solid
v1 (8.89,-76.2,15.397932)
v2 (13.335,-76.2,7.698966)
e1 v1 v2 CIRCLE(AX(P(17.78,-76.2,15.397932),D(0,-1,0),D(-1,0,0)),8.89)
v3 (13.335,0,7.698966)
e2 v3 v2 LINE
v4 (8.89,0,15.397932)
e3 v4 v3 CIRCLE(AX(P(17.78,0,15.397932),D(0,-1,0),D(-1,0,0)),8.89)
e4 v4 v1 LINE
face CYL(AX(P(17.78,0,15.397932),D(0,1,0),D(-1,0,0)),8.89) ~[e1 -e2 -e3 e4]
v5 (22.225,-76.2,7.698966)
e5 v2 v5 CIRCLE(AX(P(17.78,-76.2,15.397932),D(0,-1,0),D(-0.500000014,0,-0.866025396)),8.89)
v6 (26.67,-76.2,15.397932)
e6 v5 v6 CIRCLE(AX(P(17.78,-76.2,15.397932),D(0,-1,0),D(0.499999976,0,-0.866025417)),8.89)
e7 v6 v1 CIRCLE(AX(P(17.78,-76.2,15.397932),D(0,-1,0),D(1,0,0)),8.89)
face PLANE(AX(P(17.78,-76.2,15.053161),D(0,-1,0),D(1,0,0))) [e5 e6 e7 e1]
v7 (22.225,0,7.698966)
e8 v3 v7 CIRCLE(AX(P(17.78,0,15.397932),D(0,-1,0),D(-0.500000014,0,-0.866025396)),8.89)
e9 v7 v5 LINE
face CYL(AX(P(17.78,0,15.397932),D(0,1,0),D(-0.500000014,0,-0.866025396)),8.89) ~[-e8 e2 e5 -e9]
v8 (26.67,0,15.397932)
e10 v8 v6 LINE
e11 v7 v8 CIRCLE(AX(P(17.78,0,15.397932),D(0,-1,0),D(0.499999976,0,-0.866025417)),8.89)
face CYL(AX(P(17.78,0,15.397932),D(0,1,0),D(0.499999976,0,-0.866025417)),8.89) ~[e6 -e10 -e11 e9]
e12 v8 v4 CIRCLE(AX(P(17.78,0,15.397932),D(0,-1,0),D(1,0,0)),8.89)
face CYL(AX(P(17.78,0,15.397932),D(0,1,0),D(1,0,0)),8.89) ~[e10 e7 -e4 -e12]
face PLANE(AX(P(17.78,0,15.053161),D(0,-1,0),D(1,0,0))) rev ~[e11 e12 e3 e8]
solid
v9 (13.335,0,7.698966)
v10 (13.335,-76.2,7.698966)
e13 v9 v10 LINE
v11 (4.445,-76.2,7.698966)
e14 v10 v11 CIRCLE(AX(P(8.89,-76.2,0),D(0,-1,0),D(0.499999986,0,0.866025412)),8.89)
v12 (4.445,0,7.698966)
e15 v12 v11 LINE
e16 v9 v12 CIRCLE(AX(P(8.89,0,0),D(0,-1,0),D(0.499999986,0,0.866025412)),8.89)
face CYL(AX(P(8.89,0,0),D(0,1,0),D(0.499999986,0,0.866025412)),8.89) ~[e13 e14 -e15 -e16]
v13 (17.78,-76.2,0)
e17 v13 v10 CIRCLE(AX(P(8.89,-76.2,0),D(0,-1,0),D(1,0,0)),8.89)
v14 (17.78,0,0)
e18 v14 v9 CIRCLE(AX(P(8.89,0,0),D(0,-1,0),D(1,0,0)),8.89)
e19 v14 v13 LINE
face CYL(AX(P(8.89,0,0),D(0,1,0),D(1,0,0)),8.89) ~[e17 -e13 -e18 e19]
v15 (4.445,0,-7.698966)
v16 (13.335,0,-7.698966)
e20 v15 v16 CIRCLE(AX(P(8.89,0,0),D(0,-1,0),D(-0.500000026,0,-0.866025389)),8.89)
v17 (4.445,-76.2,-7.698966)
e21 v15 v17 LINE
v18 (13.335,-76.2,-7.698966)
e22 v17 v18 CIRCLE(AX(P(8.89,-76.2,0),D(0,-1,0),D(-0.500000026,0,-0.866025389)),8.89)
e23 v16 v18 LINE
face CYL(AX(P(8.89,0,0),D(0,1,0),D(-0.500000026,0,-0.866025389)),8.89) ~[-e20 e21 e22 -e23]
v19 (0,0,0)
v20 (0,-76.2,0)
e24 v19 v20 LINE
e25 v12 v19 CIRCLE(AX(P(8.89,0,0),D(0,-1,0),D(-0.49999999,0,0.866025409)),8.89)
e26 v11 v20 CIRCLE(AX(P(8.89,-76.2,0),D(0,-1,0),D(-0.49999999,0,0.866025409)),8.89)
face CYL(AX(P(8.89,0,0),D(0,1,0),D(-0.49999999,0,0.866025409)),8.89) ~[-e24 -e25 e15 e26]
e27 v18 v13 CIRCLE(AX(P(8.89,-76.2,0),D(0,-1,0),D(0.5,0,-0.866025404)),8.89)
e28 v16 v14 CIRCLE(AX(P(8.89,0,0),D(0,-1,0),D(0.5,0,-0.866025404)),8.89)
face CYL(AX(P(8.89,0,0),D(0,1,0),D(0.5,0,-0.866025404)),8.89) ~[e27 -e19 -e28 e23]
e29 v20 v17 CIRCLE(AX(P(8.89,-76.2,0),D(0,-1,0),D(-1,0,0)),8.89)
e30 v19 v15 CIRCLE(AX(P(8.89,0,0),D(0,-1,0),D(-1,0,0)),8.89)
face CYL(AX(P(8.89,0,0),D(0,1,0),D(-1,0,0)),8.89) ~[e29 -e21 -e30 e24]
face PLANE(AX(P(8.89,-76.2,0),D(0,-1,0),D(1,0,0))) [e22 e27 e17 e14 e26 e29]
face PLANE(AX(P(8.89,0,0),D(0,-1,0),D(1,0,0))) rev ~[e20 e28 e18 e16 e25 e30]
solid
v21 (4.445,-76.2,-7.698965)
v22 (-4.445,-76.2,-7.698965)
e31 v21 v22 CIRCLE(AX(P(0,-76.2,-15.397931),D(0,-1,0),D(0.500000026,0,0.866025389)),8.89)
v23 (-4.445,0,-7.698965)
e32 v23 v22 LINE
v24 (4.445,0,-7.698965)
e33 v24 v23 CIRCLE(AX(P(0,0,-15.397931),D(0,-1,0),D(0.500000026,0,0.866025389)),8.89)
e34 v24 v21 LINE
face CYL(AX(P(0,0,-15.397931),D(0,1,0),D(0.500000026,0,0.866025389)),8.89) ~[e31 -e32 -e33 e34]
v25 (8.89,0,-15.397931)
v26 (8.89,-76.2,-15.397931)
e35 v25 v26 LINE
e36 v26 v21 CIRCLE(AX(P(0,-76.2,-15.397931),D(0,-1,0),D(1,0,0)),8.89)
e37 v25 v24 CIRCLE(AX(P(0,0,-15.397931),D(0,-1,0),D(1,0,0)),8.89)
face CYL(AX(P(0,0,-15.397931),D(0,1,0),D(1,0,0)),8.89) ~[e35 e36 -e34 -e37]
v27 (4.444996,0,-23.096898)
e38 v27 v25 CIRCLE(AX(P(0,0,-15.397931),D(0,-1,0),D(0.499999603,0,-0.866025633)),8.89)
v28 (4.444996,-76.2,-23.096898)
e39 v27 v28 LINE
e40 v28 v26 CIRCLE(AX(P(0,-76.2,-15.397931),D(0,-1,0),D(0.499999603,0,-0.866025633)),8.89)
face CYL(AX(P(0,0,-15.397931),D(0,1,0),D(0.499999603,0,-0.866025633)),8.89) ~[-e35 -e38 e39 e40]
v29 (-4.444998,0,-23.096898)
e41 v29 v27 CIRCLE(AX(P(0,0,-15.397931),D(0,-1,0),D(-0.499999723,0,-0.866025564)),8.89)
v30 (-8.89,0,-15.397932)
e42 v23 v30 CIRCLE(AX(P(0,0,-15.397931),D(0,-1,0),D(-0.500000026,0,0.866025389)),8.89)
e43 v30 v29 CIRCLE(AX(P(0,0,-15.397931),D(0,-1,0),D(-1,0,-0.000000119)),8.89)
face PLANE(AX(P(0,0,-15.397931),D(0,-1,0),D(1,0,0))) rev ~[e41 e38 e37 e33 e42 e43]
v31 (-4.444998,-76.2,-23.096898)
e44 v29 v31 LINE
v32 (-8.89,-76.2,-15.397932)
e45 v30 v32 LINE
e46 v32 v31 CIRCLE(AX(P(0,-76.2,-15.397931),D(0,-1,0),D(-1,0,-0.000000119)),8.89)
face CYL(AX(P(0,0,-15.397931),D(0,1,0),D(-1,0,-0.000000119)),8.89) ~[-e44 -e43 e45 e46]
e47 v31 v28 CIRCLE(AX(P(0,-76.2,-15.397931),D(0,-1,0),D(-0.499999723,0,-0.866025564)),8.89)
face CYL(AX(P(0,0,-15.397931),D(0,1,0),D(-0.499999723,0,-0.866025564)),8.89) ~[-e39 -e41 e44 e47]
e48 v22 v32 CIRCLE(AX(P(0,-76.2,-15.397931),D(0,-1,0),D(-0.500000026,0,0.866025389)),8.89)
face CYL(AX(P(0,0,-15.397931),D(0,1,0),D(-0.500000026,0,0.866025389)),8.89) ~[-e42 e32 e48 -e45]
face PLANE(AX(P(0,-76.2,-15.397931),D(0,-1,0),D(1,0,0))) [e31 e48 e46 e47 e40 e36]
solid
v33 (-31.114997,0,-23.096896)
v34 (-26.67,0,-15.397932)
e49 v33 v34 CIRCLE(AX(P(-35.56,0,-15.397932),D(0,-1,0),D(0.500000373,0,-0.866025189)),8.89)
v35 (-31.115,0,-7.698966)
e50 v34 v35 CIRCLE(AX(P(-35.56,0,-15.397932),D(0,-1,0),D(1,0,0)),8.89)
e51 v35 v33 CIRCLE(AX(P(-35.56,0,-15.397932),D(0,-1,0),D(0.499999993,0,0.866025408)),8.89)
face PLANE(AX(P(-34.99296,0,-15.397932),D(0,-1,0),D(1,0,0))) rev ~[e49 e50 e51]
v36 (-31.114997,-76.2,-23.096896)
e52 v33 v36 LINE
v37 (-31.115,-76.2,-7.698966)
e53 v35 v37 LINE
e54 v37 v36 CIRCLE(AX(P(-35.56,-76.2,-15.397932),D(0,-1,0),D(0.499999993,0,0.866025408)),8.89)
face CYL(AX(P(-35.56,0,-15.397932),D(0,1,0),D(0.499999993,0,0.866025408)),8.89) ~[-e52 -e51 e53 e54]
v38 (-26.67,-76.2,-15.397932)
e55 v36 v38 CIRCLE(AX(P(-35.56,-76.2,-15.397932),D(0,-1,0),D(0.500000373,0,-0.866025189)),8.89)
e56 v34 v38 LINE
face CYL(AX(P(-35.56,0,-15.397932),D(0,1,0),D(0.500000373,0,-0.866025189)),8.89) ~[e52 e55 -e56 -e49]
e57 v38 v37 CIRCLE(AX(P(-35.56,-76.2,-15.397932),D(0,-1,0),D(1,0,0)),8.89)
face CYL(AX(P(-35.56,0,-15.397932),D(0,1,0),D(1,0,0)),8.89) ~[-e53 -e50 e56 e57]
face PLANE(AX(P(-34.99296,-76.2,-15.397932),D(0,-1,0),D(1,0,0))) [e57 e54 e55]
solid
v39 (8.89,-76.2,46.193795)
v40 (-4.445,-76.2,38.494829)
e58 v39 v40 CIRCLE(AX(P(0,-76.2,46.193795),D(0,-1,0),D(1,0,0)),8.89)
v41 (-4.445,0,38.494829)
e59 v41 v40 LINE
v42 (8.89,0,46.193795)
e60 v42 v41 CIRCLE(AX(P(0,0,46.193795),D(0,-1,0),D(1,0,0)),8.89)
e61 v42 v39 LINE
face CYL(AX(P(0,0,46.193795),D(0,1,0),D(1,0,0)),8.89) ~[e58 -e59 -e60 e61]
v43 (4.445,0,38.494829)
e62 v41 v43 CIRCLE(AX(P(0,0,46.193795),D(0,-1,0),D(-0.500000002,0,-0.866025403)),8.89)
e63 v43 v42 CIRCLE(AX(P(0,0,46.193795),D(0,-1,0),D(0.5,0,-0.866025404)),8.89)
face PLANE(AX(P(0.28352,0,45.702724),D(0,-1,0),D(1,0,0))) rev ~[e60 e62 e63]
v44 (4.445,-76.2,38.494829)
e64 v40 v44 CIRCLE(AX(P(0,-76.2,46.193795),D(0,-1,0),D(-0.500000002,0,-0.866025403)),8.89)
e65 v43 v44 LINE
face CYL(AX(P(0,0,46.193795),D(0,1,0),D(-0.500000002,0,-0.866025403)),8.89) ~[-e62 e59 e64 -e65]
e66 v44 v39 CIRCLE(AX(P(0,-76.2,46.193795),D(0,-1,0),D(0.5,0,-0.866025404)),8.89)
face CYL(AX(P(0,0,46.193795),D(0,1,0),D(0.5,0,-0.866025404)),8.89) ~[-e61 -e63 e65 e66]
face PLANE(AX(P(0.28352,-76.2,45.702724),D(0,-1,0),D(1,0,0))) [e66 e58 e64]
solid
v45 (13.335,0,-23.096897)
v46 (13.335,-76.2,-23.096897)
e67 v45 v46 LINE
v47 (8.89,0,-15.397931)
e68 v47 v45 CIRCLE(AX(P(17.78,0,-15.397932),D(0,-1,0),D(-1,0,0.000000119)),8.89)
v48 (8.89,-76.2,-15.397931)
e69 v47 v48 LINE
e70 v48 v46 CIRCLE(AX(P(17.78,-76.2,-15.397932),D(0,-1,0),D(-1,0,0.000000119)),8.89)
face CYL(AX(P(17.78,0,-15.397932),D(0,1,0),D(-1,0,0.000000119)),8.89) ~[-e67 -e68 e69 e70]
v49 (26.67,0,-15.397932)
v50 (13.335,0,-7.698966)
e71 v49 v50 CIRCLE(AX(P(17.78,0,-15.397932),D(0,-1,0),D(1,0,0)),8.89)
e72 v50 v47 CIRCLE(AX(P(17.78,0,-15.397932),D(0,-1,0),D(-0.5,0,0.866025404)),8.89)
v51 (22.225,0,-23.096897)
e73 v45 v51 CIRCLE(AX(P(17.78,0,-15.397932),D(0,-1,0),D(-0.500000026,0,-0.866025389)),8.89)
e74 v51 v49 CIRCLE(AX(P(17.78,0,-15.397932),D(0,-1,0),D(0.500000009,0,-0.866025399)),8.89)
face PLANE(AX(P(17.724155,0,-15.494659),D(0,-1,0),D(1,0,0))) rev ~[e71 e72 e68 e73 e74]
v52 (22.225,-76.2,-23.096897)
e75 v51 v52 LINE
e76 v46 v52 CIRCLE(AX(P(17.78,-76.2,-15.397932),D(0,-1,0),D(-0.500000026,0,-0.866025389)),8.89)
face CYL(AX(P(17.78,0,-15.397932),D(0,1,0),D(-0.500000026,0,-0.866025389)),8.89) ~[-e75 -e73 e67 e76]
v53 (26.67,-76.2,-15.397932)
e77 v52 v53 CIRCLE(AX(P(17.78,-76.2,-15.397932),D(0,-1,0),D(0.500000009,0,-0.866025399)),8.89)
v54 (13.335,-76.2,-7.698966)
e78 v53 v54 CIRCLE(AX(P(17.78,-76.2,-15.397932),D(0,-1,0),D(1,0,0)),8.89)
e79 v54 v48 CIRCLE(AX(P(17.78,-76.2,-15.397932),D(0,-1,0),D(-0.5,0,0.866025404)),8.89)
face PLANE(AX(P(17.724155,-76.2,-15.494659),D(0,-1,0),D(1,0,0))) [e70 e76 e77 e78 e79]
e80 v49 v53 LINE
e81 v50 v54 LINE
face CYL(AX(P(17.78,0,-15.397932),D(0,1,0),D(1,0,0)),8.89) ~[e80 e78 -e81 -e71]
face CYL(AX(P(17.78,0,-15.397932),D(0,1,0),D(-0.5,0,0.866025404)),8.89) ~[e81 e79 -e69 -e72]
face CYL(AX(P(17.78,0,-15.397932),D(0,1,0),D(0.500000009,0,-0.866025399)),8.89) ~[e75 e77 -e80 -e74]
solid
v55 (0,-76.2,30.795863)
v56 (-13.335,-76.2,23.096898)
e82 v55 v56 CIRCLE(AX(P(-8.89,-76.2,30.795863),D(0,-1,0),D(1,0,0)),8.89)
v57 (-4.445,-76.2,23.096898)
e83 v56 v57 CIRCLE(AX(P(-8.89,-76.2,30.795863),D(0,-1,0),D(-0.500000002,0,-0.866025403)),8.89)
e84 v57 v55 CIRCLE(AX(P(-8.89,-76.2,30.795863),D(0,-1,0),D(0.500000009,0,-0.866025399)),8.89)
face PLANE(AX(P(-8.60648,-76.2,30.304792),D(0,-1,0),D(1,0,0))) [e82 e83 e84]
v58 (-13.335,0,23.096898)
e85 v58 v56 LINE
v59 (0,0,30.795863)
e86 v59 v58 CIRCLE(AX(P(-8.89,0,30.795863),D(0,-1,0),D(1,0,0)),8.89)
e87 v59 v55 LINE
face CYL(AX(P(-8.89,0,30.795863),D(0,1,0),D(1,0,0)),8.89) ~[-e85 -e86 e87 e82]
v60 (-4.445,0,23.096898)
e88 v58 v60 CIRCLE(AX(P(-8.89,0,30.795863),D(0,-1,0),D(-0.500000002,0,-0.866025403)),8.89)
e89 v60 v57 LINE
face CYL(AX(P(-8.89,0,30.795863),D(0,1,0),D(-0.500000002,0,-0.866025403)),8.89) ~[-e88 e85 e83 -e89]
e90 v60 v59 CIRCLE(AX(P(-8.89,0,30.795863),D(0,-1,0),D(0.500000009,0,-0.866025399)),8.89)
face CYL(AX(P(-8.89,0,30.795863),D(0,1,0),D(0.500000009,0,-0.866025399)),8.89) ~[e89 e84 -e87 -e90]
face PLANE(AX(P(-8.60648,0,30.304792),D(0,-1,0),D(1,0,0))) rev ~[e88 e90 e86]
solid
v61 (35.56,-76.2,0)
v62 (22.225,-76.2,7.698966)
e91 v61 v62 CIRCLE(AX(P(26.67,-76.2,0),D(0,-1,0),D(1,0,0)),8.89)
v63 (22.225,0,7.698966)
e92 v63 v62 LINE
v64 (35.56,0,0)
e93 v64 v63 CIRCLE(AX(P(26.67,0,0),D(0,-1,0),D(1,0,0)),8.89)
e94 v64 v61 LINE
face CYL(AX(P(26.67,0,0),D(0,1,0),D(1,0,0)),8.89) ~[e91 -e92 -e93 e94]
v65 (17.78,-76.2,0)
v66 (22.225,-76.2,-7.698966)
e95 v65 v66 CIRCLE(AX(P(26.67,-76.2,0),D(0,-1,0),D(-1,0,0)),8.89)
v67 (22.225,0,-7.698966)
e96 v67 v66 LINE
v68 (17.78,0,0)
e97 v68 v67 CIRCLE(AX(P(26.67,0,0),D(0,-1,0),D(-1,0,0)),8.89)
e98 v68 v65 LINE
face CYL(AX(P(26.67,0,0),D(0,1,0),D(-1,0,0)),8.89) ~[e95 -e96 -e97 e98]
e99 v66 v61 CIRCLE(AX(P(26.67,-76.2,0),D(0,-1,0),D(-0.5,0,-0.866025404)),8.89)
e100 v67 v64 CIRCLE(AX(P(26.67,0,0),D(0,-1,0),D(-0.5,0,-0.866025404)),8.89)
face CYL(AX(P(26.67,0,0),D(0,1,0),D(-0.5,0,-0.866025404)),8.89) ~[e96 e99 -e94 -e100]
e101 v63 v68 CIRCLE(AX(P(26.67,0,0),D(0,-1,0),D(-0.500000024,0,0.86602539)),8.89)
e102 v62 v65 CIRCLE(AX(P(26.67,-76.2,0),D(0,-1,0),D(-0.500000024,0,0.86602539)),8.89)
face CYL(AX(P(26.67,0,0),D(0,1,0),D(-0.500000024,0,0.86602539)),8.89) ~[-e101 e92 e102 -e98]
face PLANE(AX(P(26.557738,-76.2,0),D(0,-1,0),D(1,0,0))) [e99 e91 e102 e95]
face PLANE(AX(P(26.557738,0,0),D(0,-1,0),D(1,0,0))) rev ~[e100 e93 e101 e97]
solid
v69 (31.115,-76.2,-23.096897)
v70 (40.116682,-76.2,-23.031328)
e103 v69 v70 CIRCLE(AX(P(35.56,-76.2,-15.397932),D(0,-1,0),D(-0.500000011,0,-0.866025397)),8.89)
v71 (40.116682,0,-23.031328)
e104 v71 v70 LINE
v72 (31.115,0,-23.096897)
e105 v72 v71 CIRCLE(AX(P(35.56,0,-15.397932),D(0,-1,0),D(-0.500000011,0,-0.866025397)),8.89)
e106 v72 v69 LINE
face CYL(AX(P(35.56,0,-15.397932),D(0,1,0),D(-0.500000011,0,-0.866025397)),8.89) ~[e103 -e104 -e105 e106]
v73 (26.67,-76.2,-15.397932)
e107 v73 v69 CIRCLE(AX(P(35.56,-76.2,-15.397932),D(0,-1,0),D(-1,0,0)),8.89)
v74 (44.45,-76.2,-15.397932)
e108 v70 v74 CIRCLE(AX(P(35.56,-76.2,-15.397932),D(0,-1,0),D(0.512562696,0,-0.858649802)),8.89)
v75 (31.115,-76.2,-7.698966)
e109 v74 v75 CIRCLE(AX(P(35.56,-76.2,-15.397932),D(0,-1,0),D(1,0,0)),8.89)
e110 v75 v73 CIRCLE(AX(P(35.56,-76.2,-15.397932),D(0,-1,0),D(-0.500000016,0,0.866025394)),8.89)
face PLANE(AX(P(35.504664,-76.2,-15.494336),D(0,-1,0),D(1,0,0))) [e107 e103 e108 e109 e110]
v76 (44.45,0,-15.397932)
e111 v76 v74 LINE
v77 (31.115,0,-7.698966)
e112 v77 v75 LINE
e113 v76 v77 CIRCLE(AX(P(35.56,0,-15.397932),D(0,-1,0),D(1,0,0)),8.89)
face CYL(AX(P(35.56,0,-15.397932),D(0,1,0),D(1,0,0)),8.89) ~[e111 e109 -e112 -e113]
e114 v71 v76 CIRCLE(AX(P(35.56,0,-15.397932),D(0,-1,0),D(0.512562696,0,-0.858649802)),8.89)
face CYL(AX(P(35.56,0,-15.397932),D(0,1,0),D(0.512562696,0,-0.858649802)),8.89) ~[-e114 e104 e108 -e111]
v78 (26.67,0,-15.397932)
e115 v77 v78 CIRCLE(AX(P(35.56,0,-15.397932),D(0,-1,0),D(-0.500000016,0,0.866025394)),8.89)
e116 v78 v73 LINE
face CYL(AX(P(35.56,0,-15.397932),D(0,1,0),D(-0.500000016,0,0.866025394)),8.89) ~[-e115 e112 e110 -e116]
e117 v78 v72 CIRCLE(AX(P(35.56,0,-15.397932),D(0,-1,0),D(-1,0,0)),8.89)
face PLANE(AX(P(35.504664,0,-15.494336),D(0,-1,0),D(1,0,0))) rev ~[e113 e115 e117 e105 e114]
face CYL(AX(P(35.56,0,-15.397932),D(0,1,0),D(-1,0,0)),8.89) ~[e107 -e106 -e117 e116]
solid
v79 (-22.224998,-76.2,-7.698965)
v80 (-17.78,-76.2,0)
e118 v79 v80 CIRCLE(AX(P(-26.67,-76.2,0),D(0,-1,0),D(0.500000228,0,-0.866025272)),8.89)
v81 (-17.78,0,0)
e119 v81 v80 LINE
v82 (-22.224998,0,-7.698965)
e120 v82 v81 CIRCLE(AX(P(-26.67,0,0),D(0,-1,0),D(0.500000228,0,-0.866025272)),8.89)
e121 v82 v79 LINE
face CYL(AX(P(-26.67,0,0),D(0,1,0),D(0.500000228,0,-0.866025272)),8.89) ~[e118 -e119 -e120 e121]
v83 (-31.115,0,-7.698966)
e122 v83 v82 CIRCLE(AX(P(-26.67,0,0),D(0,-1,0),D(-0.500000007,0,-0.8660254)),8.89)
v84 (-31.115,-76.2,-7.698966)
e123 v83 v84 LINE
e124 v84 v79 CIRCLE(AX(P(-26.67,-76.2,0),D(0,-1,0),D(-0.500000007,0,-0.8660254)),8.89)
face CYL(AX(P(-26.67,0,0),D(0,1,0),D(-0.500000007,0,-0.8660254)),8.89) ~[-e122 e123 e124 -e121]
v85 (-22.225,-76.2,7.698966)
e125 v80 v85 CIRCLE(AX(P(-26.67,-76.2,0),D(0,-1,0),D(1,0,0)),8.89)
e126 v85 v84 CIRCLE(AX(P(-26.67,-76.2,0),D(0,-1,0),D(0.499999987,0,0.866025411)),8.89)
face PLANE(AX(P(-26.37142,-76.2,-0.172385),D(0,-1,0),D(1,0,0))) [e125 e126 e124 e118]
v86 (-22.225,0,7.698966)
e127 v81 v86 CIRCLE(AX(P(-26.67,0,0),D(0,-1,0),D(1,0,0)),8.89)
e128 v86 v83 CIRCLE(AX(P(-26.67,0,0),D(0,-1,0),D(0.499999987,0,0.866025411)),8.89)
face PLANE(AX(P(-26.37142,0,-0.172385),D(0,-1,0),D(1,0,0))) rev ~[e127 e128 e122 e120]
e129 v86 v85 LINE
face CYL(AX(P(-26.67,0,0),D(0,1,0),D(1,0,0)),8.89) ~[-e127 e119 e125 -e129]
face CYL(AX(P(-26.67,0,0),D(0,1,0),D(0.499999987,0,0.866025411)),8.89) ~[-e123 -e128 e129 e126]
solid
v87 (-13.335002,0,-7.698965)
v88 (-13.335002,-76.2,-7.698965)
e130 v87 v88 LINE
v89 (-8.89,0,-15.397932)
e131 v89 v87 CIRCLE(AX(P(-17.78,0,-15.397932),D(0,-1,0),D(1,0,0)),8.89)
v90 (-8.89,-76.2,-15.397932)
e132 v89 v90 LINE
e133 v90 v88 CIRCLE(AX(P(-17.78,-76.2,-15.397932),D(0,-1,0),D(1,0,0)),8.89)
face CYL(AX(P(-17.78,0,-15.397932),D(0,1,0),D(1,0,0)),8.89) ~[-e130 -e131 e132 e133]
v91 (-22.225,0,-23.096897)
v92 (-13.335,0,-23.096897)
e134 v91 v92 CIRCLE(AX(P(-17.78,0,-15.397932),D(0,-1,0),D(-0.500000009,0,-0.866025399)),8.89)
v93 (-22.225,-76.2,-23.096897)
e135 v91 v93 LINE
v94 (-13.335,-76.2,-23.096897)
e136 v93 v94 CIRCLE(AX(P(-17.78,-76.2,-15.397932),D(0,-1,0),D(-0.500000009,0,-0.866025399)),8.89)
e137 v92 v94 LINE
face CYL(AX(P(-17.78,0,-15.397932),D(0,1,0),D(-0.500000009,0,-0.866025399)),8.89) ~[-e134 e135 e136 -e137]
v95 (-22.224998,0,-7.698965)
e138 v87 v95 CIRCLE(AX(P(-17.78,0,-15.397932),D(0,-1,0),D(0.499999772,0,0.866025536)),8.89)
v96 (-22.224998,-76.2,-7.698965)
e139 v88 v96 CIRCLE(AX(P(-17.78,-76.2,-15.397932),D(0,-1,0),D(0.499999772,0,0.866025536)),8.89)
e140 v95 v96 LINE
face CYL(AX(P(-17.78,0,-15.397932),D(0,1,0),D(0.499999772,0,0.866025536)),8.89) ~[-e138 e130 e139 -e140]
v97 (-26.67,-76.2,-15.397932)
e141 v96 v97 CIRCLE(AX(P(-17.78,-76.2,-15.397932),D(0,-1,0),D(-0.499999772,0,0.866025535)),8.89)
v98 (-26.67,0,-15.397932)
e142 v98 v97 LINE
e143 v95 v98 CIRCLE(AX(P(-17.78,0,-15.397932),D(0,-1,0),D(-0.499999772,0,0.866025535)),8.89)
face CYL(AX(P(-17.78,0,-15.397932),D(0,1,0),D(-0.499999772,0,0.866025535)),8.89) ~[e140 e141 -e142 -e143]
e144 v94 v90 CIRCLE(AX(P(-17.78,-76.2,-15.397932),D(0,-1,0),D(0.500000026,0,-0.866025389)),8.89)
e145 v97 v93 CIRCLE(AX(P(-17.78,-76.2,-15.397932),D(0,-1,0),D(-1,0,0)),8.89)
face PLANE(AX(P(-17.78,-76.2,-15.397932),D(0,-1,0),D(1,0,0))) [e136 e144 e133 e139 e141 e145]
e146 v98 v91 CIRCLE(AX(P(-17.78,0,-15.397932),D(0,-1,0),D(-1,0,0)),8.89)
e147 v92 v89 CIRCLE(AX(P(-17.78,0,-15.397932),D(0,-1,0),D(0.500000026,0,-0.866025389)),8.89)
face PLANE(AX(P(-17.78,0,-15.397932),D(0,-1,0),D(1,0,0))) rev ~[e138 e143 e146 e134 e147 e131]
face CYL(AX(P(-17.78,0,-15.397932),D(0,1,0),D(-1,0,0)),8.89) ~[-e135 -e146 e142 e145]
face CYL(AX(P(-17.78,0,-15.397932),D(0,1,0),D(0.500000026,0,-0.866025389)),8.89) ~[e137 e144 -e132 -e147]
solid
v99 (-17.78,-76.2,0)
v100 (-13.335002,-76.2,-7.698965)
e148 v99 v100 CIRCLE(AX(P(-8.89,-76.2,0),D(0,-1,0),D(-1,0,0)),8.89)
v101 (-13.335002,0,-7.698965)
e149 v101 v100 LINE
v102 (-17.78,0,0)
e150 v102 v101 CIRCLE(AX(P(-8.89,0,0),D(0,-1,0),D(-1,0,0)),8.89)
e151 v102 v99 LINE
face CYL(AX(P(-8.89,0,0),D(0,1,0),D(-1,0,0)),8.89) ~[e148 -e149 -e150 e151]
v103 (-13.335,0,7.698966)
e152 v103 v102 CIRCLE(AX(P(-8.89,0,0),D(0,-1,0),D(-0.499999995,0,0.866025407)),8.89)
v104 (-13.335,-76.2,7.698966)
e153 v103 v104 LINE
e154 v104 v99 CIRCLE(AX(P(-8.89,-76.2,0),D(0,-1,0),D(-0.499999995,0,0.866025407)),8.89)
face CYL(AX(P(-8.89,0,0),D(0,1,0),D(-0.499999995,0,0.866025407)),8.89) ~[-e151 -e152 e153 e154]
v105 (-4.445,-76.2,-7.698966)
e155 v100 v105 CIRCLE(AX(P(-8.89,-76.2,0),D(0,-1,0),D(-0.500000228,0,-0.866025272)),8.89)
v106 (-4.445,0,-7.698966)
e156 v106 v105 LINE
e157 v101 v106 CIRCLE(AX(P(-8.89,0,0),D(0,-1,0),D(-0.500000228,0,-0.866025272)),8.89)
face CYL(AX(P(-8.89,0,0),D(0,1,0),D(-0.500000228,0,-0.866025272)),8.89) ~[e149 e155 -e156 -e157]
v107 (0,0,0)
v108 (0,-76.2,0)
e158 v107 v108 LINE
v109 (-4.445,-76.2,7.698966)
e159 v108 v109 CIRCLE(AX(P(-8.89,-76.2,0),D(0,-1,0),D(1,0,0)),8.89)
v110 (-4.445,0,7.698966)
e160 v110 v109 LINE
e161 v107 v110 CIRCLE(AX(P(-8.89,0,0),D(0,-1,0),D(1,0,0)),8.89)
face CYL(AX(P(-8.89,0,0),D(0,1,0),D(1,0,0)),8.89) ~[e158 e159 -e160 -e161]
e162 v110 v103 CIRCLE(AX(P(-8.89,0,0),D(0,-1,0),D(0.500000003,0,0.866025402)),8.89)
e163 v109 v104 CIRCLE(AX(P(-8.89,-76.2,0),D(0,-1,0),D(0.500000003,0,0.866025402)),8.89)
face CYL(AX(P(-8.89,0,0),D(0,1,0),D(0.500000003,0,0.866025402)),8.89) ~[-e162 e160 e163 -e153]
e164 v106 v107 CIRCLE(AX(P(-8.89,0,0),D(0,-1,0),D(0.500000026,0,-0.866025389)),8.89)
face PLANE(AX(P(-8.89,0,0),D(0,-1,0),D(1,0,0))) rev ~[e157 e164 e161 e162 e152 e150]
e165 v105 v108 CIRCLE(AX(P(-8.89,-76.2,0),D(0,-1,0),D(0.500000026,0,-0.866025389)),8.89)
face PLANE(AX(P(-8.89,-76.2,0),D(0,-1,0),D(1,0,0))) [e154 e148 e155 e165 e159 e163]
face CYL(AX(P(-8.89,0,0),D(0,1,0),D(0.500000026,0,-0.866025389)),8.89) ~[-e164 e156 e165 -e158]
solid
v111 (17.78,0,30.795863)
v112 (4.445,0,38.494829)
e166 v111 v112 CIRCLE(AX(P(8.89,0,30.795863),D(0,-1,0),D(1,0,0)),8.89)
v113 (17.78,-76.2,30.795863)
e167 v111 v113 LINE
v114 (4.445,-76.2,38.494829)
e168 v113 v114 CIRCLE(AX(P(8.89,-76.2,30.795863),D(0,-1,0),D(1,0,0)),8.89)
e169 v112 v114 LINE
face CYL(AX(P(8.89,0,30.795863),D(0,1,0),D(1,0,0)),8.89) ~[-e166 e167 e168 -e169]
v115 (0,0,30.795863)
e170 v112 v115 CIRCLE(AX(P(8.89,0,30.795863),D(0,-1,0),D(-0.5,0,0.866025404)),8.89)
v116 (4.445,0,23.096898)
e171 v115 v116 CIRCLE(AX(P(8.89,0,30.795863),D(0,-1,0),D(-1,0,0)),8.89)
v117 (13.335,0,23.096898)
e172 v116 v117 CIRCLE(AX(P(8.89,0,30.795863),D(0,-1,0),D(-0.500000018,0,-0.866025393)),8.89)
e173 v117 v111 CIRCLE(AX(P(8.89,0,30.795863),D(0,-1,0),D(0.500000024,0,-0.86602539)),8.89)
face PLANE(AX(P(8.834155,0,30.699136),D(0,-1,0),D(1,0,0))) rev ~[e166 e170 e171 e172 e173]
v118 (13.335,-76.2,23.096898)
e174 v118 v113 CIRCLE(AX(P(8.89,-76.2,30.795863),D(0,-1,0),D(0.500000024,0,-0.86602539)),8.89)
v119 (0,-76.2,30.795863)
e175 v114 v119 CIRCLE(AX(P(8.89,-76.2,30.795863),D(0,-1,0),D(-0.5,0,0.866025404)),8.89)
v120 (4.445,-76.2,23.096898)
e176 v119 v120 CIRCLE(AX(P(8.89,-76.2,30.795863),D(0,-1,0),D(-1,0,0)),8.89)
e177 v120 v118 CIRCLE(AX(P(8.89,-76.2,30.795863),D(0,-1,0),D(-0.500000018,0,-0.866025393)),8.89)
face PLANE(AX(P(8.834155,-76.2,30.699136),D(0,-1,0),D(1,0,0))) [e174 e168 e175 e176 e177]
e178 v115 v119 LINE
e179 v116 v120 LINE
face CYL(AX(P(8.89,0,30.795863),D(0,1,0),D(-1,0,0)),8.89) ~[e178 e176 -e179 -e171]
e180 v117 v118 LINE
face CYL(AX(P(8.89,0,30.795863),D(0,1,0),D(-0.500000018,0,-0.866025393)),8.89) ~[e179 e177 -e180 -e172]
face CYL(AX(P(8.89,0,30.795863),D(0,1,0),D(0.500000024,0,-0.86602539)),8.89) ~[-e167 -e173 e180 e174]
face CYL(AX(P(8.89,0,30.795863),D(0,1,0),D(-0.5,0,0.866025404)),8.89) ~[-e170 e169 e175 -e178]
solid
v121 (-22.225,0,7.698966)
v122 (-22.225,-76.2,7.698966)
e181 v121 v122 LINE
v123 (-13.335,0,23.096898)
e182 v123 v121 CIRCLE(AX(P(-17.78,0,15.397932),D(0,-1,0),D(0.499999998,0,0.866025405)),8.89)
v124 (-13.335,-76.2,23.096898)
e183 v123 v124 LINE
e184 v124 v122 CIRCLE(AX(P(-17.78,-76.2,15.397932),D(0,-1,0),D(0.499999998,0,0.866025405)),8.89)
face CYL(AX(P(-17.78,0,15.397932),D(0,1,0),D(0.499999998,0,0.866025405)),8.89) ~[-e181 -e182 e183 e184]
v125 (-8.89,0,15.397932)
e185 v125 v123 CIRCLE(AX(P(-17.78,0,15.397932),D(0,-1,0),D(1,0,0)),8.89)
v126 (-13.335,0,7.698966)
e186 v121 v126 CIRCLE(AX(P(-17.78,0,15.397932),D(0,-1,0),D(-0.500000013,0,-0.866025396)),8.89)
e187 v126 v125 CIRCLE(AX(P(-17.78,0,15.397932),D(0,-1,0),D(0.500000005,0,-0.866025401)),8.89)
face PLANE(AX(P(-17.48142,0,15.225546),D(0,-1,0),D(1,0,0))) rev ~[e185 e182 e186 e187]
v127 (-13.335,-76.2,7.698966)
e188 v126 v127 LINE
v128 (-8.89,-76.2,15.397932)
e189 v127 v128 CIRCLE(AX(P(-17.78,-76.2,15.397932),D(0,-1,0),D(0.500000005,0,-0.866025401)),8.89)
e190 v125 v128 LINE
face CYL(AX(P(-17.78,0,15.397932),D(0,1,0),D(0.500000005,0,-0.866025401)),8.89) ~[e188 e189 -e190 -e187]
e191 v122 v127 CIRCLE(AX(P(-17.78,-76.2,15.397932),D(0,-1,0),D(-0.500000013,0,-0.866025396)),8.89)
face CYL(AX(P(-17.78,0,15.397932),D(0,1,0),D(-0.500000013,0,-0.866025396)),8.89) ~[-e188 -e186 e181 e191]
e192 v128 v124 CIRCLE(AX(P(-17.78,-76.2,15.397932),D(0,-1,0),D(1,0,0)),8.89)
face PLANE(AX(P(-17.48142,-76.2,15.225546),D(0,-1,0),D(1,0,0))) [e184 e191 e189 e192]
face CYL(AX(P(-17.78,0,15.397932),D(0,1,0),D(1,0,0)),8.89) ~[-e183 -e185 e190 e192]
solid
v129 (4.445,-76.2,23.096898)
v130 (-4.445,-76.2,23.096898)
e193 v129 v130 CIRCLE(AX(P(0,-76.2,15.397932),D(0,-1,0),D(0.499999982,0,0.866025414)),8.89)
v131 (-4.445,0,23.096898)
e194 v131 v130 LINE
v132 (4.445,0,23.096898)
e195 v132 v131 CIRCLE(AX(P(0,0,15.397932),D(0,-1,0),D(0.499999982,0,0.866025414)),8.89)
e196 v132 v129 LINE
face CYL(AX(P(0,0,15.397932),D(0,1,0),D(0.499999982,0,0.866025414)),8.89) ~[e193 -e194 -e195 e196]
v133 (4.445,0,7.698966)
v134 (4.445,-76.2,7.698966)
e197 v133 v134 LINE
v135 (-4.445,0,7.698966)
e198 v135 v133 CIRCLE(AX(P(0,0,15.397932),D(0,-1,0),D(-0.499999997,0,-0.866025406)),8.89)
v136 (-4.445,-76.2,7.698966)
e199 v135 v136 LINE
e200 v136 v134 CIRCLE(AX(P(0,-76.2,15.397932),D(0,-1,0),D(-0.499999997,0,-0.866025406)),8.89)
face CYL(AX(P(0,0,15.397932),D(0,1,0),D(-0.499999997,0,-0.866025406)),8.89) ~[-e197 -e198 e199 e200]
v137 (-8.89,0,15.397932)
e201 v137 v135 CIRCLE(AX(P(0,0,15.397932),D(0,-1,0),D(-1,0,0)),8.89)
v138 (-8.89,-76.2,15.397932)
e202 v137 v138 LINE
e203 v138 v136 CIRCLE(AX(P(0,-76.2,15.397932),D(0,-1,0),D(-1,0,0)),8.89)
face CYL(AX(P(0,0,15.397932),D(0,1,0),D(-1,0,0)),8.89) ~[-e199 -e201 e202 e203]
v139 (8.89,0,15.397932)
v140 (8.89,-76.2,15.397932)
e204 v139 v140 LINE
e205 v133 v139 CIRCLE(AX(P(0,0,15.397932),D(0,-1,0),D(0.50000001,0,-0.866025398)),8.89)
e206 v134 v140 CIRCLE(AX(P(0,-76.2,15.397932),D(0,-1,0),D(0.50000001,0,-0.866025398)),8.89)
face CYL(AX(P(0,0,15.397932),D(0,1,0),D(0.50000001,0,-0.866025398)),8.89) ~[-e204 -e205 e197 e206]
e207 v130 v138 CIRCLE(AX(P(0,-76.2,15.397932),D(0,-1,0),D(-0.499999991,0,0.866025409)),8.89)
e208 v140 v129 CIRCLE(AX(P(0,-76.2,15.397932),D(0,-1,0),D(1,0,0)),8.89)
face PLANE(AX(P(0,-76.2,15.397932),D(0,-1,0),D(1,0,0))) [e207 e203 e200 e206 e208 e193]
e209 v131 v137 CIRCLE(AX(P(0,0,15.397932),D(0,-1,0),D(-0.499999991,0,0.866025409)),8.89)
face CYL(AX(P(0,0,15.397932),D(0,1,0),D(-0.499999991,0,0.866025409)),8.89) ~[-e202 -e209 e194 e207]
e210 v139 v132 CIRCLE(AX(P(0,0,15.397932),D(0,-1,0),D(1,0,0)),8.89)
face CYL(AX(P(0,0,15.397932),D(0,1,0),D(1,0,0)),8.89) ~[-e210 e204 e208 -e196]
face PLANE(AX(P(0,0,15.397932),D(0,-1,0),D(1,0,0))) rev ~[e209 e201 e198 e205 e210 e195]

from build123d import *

# Parameters (mm, degrees)
F1_DEPTH = 76.2


# Not quite as in the source:
# - a feature names something its author has since deleted; it is built from what else it names


with BuildPart() as f1:
    # F0 (on Front) → F1 (new body)
    with BuildSketch(Plane.XZ):
        with BuildLine():
            ThreePointArc((-13.3350000199, 23.0968975304), (-25.4789658129, 19.8429317256), (-22.2250001126, 7.6989659046))
            ThreePointArc((-22.2250001126, 7.6989659046), (-17.780000037, 6.5079316793), (-13.3349999515, 7.6989658677))
            ThreePointArc((-13.3349999515, 7.6989658677), (-10.0810341464, 10.9529317035), (-8.89, 15.3979316793))
            ThreePointArc((-8.89, 15.3979316793), (-10.0810341661, 19.8429316893), (-13.3350000199, 23.0968975304))
        make_face()
    extrude(amount=F1_DEPTH)


with BuildPart() as f1b:
    # F0 (on Front) → F1, piece 2 (new body)
    with BuildSketch(Plane.XZ):
        with BuildLine():
            ThreePointArc((-8.89, 15.3979316793), (-7.6989658311, 10.9529316645), (-4.4449999705, 7.6989658226))
            ThreePointArc((-4.4449999705, 7.6989658226), (6.75e-08, 6.5079316793), (4.4450000875, 7.6989658901))
            ThreePointArc((4.4450000875, 7.6989658901), (7.6989658649, 10.952931723), (8.89, 15.3979316793))
            ThreePointArc((8.89, 15.3979316793), (7.6989657927, 19.8429317606), (4.4449998375, 23.0968976128))
            ThreePointArc((4.4449998375, 23.0968976128), (-4.81e-08, 24.2879316793), (-4.4449999207, 23.0968975647))
            ThreePointArc((-4.4449999207, 23.0968975647), (-7.6989658168, 19.8429317189), (-8.89, 15.3979316793))
        make_face()
    extrude(amount=F1_DEPTH)


with BuildPart() as f1c:
    # F0 (on Front) → F1, piece 3 (new body)
    with BuildSketch(Plane.XZ):
        with BuildLine():
            ThreePointArc((8.89, 15.3979316793), (10.0810341244, 10.9529317415), (13.3349998755, 7.6989659115))
            ThreePointArc((13.3349998755, 7.6989659115), (17.7799998064, 6.5079316793), (22.2249997892, 7.6989657179))
            ThreePointArc((22.2249997892, 7.6989657179), (25.4789657788, 10.9529315739), (26.67, 15.3979316793))
            ThreePointArc((26.67, 15.3979316793), (22.2250001076, 23.0968974568), (13.3350002151, 23.0968976431))
            ThreePointArc((13.3350002151, 23.0968976431), (10.0810342225, 19.8429317869), (8.89, 15.3979316793))
        make_face()
    extrude(amount=F1_DEPTH)


with BuildPart() as f1d:
    # F0 (on Front) → F1, piece 4 (new body)
    with BuildSketch(Plane.XZ):
        with BuildLine():
            ThreePointArc((22.2249997892, 7.6989657179), (18.9710340995, 4.4449998946), (17.78, 0))
            ThreePointArc((17.78, 0), (18.9710341607, -4.4450000007), (22.2250000013, -7.6989658404))
            ThreePointArc((22.2250000013, -7.6989658404), (26.6699999179, -8.89), (31.1149998565, -7.6989659225))
            ThreePointArc((31.1149998565, -7.6989659225), (34.3689657982, -4.4450000718), (35.56, 0))
            ThreePointArc((35.56, 0), (31.1149998946, 7.6989659005), (22.2249997892, 7.6989657179))
        make_face()
    extrude(amount=F1_DEPTH)


with BuildPart() as f1e:
    # F0 (on Front) → F1, piece 5 (new body)
    with BuildSketch(Plane.XZ):
        with BuildLine():
            ThreePointArc((4.4450000875, 7.6989658901), (1.1910341856, 4.4450000437), (0, 0))
            ThreePointArc((0, 0), (1.191034094, -4.4449998851), (4.4449997703, -7.698965707))
            ThreePointArc((4.4449997703, -7.698965707), (8.8899998666, -8.89), (13.3349999987, -7.6989658404))
            ThreePointArc((13.3349999987, -7.6989658404), (16.5889658393, -4.4450000007), (17.78, 0))
            ThreePointArc((17.78, 0), (16.5889658037, 4.4450000622), (13.3349998755, 7.6989659115))
            ThreePointArc((13.3349998755, 7.6989659115), (8.8899999786, 8.89), (4.4450000875, 7.6989658901))
        make_face()
    extrude(amount=F1_DEPTH)


with BuildPart() as f1f:
    # F0 (on Front) → F1, piece 6 (new body)
    with BuildSketch(Plane.XZ):
        with BuildLine():
            ThreePointArc((-13.3349999515, 7.6989658677), (-16.5889658256, 4.4450000243), (-17.78, 0))
            ThreePointArc((-17.78, 0), (-16.5889664254, -4.4449989854), (-13.3350020292, -7.6989646681))
            ThreePointArc((-13.3350020292, -7.6989646681), (-8.8900010389, -8.89), (-4.4449997703, -7.698965707))
            ThreePointArc((-4.4449997703, -7.698965707), (-1.191034094, -4.4449998851), (0, 0))
            ThreePointArc((0, 0), (-1.1910341518, 4.4449999853), (-4.4449999705, 7.6989658226))
            ThreePointArc((-4.4449999705, 7.6989658226), (-8.889999955, 8.89), (-13.3349999515, 7.6989658677))
        make_face()
    extrude(amount=F1_DEPTH)


with BuildPart() as f1g:
    # F0 (on Front) → F1, piece 7 (new body)
    with BuildSketch(Plane.XZ):
        with BuildLine():
            ThreePointArc((-22.2249979726, -7.6989646691), (-18.9710335751, -4.4449989863), (-17.78, 0))
            ThreePointArc((-17.78, 0), (-18.9710341928, 4.4450000563), (-22.2250001126, 7.6989659046))
            ThreePointArc((-22.2250001126, 7.6989659046), (-34.3689658547, 4.4449999739), (-31.1150000603, -7.6989658048))
            ThreePointArc((-31.1150000603, -7.6989658048), (-26.6699988643, -8.89), (-22.2249979726, -7.6989646691))
        make_face()
    extrude(amount=F1_DEPTH)


with BuildPart() as f1h:
    # F0 (on Front) → F1, piece 8 (new body)
    with BuildSketch(Plane.XZ):
        with BuildLine():
            ThreePointArc((-26.67, -15.3979316793), (-27.8610341778, -10.9529316492), (-31.1150000603, -7.6989658048))
            ThreePointArc((-31.1150000603, -7.6989658048), (-43.2589658414, -10.9529316824), (-40.0050000541, -23.0968974877))
            ThreePointArc((-40.0050000541, -23.0968974877), (-35.559998118, -24.2879316793), (-31.1149966862, -23.0968956057))
            ThreePointArc((-31.1149966862, -23.0968956057), (-27.8610332037, -19.8429300224), (-26.67, -15.3979316793))
        make_face()
    extrude(amount=F1_DEPTH)


with BuildPart() as f1i:
    # F0 (on Front) → F1, piece 9 (new body)
    with BuildSketch(Plane.XZ):
        with BuildLine():
            ThreePointArc((-13.3350020292, -7.6989646681), (-17.780000001, -6.5079316793), (-22.2249979726, -7.6989646691))
            ThreePointArc((-22.2249979726, -7.6989646691), (-25.4789652544, -10.9529306656), (-26.67, -15.3979316793))
            ThreePointArc((-26.67, -15.3979316793), (-25.4789658625, -19.8429316396), (-22.2250000793, -23.0968974731))
            ThreePointArc((-22.2250000793, -23.0968974731), (-17.7799999131, -24.2879316793), (-13.3349997703, -23.0968973863))
            ThreePointArc((-13.3349997703, -23.0968973863), (-10.081034094, -19.8429315644), (-8.89, -15.3979316793))
            ThreePointArc((-8.89, -15.3979316793), (-10.0810347461, -10.9529306647), (-13.3350020292, -7.6989646681))
        make_face()
    extrude(amount=F1_DEPTH)


with BuildPart() as f1j:
    # F0 (on Front) → F1, piece 10 (new body)
    with BuildSketch(Plane.XZ):
        with BuildLine():
            ThreePointArc((4.4450002297, -7.6989649112), (0, -6.5079306182), (-4.4450002297, -7.6989649112))
            ThreePointArc((-4.4450002297, -7.6989649112), (-7.6989661712, -10.9529311925), (-8.89, -15.3979316793))
            ThreePointArc((-8.89, -15.3979316793), (-7.6989648637, -19.8429323085), (-4.4449975383, -23.0968978791))
            ThreePointArc((-4.4449975383, -23.0968978791), (-6.17e-07, -24.2879306182), (4.4449964696, -23.0968984961))
            ThreePointArc((4.4449964696, -23.0968984961), (7.6989648205, -19.8429323834), (8.89, -15.3979306182))
            ThreePointArc((8.89, -15.3979306182), (7.698965906, -10.9529307331), (4.4450002297, -7.6989649112))
        make_face()
    extrude(amount=F1_DEPTH)


with BuildPart() as f1k:
    # F0 (on Front) → F1, piece 11 (new body)
    with BuildSketch(Plane.XZ):
        with BuildLine():
            ThreePointArc((22.2250000013, -7.6989658404), (17.78, -6.5079316793), (13.3349999987, -7.6989658404))
            ThreePointArc((13.3349999987, -7.6989658404), (10.0810344252, -10.9529312205), (8.89, -15.3979306182))
            ThreePointArc((8.89, -15.3979306182), (10.0810338288, -19.842931105), (13.3349997703, -23.0968973863))
            ThreePointArc((13.3349997703, -23.0968973863), (17.7799999128, -24.2879316793), (22.2250000786, -23.0968974735))
            ThreePointArc((22.2250000786, -23.0968974735), (25.4789658623, -19.84293164), (26.67, -15.3979316793))
            ThreePointArc((26.67, -15.3979316793), (25.47896584, -10.9529316799), (22.2250000013, -7.6989658404))
        make_face()
    extrude(amount=F1_DEPTH)


with BuildPart() as f1l:
    # F0 (on Front) → F1, piece 12 (new body)
    with BuildSketch(Plane.XZ):
        with BuildLine():
            ThreePointArc((44.45, -15.3979316793), (40.0049999282, -7.6989657982), (31.1149998565, -7.6989659225))
            ThreePointArc((31.1149998565, -7.6989659225), (27.8610341189, -10.952931751), (26.67, -15.3979316793))
            ThreePointArc((26.67, -15.3979316793), (27.861034132, -19.8429316301), (31.1149999017, -23.0968974622))
            ThreePointArc((31.1149999017, -23.0968974622), (35.6247538204, -24.2876958462), (40.1166823692, -23.031328419))
            ThreePointArc((40.1166823692, -23.031328419), (43.2911385404, -19.7867352599), (44.45, -15.3979316793))
        make_face()
    extrude(amount=F1_DEPTH)


with BuildPart() as f1m:
    # F0 (on Front) → F1, piece 13 (new body)
    with BuildSketch(Plane.XZ):
        with BuildLine():
            ThreePointArc((-4.4450000175, 38.4948292083), (-16.5889658389, 35.2408633598), (-13.3350000199, 23.0968975304))
            ThreePointArc((-13.3350000199, 23.0968975304), (-8.8899999657, 21.9058633586), (-4.4449999207, 23.0968975647))
            ThreePointArc((-4.4449999207, 23.0968975647), (-1.1910341375, 26.3508633982), (0, 30.7958633586))
            ThreePointArc((0, 30.7958633586), (-1.1910341654, 35.2408633673), (-4.4450000175, 38.4948292083))
        make_face()
    extrude(amount=F1_DEPTH)


with BuildPart() as f1n:
    # F0 (on Front) → F1, piece 14 (new body)
    with BuildSketch(Plane.XZ):
        with BuildLine():
            ThreePointArc((4.4449999987, 38.4948291975), (1.19103416, 35.2408633579), (0, 30.7958633586))
            ThreePointArc((0, 30.7958633586), (1.1910341134, 26.3508634398), (4.4449998375, 23.0968976128))
            ThreePointArc((4.4449998375, 23.0968976128), (8.8900000304, 21.9058633586), (13.3350002151, 23.0968976431))
            ThreePointArc((13.3350002151, 23.0968976431), (16.5889659017, 26.3508634661), (17.78, 30.7958633586))
            ThreePointArc((17.78, 30.7958633586), (13.3349999993, 38.4948291986), (4.4449999987, 38.4948291975))
        make_face()
    extrude(amount=F1_DEPTH)


with BuildPart() as f1o:
    # F0 (on Front) → F1, piece 15 (new body)
    with BuildSketch(Plane.XZ):
        with BuildLine():
            ThreePointArc((8.89, 46.1937950379), (-4.4449999913, 53.8927608825), (-4.4450000175, 38.4948292083))
            ThreePointArc((-4.4450000175, 38.4948292083), (-1.08e-08, 37.3037950379), (4.4449999987, 38.4948291975))
            ThreePointArc((4.4449999987, 38.4948291975), (7.6989658393, 41.7487950372), (8.89, 46.1937950379))
        make_face()
    extrude(amount=F1_DEPTH)


solid = Compound([f1.part, f1b.part, f1c.part, f1d.part, f1e.part, f1f.part, f1g.part, f1h.part, f1i.part, f1j.part, f1k.part, f1l.part, f1m.part, f1n.part, f1o.part])
